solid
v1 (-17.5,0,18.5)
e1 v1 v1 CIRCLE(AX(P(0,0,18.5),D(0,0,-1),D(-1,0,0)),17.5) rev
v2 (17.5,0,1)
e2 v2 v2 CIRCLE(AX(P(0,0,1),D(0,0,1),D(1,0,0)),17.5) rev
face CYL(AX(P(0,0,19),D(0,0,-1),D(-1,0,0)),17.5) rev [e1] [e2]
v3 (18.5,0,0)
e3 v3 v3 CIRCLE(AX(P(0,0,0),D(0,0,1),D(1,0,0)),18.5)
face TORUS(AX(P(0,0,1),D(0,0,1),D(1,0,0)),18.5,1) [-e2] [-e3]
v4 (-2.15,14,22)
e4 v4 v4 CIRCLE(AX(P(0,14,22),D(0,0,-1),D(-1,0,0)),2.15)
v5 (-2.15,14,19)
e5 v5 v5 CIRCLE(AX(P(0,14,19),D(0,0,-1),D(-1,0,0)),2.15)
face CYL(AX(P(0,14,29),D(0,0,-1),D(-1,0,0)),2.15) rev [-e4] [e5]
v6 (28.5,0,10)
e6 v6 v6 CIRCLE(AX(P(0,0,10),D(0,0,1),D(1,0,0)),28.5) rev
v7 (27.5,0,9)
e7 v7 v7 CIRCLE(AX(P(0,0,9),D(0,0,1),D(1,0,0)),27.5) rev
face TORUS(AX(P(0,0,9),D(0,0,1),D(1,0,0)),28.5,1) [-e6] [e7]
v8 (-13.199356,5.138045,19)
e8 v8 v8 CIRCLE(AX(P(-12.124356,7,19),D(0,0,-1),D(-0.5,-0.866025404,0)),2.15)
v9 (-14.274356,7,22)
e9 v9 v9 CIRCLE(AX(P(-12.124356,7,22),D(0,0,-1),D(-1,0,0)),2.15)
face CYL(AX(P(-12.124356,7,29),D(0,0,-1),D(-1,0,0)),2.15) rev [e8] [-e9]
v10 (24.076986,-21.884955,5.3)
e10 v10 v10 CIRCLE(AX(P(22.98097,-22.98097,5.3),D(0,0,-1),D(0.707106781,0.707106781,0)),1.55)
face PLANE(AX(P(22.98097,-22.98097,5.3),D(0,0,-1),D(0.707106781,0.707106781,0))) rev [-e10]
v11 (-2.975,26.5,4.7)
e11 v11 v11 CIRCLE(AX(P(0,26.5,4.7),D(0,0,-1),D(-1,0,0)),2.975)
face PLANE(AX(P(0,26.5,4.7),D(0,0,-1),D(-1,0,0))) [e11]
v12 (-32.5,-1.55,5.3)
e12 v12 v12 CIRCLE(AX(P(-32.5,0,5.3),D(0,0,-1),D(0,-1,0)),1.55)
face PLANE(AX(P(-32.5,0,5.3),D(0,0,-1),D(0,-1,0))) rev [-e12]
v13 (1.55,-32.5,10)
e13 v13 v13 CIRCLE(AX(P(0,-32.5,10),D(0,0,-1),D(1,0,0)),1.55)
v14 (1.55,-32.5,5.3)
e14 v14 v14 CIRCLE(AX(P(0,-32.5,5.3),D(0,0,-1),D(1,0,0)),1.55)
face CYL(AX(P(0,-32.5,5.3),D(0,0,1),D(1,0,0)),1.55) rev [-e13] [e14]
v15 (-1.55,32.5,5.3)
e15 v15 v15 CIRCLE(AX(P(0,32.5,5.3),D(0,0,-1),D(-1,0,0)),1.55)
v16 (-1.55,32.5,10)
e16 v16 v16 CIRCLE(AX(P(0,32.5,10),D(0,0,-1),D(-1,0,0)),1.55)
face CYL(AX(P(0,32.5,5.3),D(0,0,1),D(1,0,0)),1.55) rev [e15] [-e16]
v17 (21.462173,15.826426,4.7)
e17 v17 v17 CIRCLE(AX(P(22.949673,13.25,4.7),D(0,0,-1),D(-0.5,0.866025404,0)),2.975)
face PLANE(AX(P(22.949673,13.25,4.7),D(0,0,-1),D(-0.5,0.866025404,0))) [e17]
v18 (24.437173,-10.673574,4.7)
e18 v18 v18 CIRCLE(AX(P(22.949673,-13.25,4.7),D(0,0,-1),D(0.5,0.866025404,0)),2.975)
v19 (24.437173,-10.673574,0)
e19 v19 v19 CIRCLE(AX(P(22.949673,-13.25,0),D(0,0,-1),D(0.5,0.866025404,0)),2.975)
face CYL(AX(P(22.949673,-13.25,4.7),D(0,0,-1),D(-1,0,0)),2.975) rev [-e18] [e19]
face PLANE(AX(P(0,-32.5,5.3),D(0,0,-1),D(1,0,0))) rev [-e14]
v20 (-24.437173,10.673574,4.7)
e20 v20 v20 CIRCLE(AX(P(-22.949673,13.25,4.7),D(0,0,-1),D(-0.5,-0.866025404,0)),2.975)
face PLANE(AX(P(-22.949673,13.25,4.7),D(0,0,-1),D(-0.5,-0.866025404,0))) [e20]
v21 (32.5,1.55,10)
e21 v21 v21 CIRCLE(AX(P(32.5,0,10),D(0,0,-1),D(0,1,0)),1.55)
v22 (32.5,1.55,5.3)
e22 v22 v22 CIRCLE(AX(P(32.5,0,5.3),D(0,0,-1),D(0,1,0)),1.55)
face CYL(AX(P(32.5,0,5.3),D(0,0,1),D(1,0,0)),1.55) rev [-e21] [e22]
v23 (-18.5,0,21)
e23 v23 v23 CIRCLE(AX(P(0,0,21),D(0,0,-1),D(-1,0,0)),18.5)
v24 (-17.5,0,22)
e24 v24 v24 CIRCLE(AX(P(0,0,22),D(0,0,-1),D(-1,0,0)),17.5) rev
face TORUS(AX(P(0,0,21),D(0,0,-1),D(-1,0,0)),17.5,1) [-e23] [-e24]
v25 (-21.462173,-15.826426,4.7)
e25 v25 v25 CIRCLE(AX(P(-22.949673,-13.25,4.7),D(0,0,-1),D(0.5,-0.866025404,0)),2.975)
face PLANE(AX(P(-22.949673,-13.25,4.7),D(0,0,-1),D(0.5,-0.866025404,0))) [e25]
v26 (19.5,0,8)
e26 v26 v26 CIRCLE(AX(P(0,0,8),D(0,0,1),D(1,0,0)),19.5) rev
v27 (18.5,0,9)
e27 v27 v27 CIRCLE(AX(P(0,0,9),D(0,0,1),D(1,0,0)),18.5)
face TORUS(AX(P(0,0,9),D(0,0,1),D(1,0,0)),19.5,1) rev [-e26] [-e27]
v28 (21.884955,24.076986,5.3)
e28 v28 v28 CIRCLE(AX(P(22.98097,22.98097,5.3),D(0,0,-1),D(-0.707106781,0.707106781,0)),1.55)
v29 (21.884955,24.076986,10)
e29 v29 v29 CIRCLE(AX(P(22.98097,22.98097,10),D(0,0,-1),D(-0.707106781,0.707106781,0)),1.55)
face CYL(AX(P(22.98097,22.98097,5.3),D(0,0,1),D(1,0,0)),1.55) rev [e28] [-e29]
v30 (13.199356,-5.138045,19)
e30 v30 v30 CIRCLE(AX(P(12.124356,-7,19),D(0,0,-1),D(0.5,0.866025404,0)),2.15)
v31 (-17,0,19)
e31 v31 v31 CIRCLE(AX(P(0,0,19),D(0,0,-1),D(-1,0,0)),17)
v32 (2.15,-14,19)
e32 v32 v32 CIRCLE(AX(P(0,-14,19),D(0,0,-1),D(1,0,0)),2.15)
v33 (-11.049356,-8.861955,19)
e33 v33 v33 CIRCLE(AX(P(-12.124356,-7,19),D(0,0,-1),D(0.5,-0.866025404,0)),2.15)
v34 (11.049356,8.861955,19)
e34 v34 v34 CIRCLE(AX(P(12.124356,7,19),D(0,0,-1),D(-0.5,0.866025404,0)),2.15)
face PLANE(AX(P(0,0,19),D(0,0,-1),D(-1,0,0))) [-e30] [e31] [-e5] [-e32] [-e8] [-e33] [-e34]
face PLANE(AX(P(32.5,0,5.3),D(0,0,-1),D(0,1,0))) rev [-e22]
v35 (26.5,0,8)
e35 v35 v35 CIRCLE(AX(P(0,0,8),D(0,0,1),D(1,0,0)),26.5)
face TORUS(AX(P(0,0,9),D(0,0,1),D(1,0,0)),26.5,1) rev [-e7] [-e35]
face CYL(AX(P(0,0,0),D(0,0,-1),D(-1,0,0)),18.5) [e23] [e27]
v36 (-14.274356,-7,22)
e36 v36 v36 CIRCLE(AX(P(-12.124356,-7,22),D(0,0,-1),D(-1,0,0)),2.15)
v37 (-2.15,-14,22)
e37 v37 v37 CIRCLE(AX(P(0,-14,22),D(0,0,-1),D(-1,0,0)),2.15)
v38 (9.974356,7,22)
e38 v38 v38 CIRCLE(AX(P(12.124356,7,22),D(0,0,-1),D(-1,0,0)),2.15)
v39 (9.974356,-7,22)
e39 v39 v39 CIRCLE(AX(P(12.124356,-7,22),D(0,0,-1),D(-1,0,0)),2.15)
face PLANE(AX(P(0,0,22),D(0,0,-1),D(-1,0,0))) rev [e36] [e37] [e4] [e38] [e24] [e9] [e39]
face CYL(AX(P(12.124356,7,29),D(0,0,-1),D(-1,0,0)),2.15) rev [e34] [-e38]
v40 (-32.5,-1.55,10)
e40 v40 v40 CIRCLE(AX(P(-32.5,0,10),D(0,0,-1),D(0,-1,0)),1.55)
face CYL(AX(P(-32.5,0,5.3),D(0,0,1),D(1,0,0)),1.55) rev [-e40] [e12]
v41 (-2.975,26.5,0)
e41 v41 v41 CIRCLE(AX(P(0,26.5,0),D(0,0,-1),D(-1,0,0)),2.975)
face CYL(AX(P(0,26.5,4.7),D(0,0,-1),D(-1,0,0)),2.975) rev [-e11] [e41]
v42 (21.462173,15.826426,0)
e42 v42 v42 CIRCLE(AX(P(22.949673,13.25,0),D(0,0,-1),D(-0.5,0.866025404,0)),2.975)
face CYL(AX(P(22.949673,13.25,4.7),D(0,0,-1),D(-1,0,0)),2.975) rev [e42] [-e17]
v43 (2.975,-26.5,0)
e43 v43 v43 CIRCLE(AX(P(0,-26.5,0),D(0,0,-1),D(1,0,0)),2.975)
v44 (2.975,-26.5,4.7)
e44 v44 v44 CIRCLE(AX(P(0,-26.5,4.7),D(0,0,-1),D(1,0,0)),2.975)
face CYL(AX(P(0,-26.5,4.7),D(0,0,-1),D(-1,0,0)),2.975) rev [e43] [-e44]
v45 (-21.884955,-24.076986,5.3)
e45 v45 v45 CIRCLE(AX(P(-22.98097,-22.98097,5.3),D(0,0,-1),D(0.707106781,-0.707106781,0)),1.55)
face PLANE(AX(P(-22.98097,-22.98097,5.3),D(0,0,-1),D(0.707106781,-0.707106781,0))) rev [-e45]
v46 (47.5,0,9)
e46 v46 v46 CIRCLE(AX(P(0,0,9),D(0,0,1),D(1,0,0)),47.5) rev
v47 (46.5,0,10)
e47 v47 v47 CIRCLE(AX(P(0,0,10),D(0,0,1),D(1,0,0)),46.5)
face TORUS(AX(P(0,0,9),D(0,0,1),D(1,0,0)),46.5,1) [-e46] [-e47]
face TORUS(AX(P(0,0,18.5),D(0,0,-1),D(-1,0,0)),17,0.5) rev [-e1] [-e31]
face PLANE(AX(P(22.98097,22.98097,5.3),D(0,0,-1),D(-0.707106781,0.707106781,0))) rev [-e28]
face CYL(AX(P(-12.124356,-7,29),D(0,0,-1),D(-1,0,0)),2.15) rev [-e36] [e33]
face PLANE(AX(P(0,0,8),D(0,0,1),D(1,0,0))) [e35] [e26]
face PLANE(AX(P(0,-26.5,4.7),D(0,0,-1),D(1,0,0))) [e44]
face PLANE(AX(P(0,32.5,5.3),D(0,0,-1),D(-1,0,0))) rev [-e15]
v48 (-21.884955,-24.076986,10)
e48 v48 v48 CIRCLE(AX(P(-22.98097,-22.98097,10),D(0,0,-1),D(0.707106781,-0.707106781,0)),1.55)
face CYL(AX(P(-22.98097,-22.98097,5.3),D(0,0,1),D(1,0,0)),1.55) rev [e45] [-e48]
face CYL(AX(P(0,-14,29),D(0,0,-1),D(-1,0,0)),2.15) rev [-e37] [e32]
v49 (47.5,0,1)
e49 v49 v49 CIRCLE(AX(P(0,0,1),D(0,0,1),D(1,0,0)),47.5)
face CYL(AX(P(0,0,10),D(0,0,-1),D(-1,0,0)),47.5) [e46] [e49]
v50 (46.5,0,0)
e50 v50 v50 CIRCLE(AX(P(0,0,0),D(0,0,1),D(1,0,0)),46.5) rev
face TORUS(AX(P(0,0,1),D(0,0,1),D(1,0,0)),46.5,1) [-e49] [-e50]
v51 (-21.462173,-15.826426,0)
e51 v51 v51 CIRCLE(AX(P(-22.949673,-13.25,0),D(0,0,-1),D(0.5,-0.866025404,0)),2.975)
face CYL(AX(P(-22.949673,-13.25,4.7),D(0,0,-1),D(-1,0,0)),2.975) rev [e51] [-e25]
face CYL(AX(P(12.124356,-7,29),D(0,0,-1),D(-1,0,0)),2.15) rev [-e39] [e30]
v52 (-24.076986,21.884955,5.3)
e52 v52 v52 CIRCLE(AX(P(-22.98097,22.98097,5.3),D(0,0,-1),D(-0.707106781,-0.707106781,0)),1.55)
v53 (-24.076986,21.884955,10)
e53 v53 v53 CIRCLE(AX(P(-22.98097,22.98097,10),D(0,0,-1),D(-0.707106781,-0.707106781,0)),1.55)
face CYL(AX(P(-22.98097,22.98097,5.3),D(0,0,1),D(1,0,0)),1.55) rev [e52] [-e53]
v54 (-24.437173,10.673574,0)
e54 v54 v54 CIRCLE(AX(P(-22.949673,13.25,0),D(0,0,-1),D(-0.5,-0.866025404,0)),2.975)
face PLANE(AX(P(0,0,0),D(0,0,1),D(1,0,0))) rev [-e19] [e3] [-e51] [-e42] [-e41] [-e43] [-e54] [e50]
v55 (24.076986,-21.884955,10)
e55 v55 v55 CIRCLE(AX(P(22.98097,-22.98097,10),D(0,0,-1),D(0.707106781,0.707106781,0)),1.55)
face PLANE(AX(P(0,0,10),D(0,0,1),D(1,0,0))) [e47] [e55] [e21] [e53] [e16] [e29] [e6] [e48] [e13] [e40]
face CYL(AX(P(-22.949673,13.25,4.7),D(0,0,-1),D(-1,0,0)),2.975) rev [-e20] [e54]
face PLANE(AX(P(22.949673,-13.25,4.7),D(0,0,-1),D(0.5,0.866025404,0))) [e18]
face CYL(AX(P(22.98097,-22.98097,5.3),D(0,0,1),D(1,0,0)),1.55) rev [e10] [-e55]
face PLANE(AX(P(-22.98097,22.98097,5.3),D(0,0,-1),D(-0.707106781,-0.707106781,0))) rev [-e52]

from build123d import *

# Parameters (mm, degrees)
SKETCH1_R           = 47.5
BOSS_EXTRUDE1_DEPTH = 10
SKETCH5_W           = 18.5
SKETCH5_H           = 22
SKETCH6_R           = 17.5
CUT_EXTRUDE7_DEPTH  = 19
SKETCH7_R           = 2.15
CUT_EXTRUDE8_DEPTH  = 10
CIRPATTERN2_COUNT   = 6
SKETCH8_R           = 1.55
CUT_EXTRUDE9_DEPTH  = 4.7
CIRPATTERN3_COUNT   = 8
CUT_EXTRUDE10_START = -2
SKETCH10_R          = 27.5
SKETCH10_R_2        = 18.5
CUT_EXTRUDE10_DEPTH = 2
SKETCH12_R          = 2.975
CUT_EXTRUDE11_DEPTH = 4.7
CIRPATTERN4_COUNT   = 6
FILLET3_R           = 1
FILLET4_R           = 0.5


with BuildPart() as part:
    # Sketch1 → Boss-Extrude1 (new body)
    with BuildSketch(Plane.XY):
        Circle(SKETCH1_R)
    extrude(amount=BOSS_EXTRUDE1_DEPTH)

    # Sketch5 → Revolve1 (revolve)
    with BuildSketch(Plane(origin=(0, 0, 0), x_dir=(1, 0, 0), z_dir=(0, 1, 0)), mode=Mode.PRIVATE) as revolve1_sk:
        with Locations((9.25, -11)):
            Rectangle(SKETCH5_W, SKETCH5_H)
    revolve(revolve1_sk.sketch.rotate(Axis((0, 0, 0), (0, 0, 1)), 180), axis=Axis((0, 0, 0), (0, 0, 1)))

    # Sketch6 → Cut-Extrude7 (cut)
    with BuildSketch(Plane(origin=(0, 0, 0), x_dir=(-1, 0, 0), z_dir=(0, 0, -1))):
        Circle(SKETCH6_R)
    cut_extrude7 = extrude(amount=-CUT_EXTRUDE7_DEPTH, mode=Mode.SUBTRACT)

    # Sketch7 → Cut-Extrude8 (cut)
    with BuildSketch(Plane(origin=(0, 0, 19), x_dir=(-1, 0, 0), z_dir=(0, 0, -1))):
        with Locations((0, 14)):
            Circle(SKETCH7_R)
    cut_extrude8 = extrude(amount=-CUT_EXTRUDE8_DEPTH, mode=Mode.SUBTRACT)

    # CirPattern2: Cut-Extrude7, Cut-Extrude8 ×6 about axis
    cirpattern2_axis = Axis((0, 0, 0), (0, 0, 1))
    add([cut_extrude7.rotate(cirpattern2_axis, i * 360 / CIRPATTERN2_COUNT) for i in range(1, CIRPATTERN2_COUNT)], mode=Mode.SUBTRACT)
    add([cut_extrude8.rotate(cirpattern2_axis, i * 360 / CIRPATTERN2_COUNT) for i in range(1, CIRPATTERN2_COUNT)], mode=Mode.SUBTRACT)

    # Sketch8 → Cut-Extrude9 (cut)
    with BuildSketch(Plane(origin=(0, 0, 10), x_dir=(-1, 0, 0), z_dir=(0, 0, -1))):
        with Locations((0, 32.5)):
            Circle(SKETCH8_R)
    cut_extrude9 = extrude(amount=CUT_EXTRUDE9_DEPTH, mode=Mode.SUBTRACT)

    # CirPattern3: Cut-Extrude9 ×8 about axis
    cirpattern3_axis = Axis((0, 0, 0), (0, 0, 1))
    for i in range(1, CIRPATTERN3_COUNT):
        add(cut_extrude9.rotate(cirpattern3_axis, i * 360 / CIRPATTERN3_COUNT), mode=Mode.SUBTRACT)

    # Sketch10 → Cut-Extrude10 (cut)
    with BuildSketch(Plane.XY.offset(10).offset(CUT_EXTRUDE10_START)):
        Circle(SKETCH10_R)
        with Locations(Location((0, 0, 0), (0, 0, 180))):
            Circle(SKETCH10_R_2, mode=Mode.SUBTRACT)
    extrude(amount=CUT_EXTRUDE10_DEPTH, mode=Mode.SUBTRACT)

    # Sketch12 → Cut-Extrude11 (cut)
    with BuildSketch(Plane(origin=(0, 0, 0), x_dir=(-1, 0, 0), z_dir=(0, 0, -1))):
        with Locations((0, 26.5)):
            Circle(SKETCH12_R)
    cut_extrude11 = extrude(amount=-CUT_EXTRUDE11_DEPTH, mode=Mode.SUBTRACT)

    # CirPattern4: Cut-Extrude11 ×6 about axis
    cirpattern4_axis = Axis((0, 0, 0), (0, 0, 1))
    for i in range(1, CIRPATTERN4_COUNT):
        add(cut_extrude11.rotate(cirpattern4_axis, i * 360 / CIRPATTERN4_COUNT), mode=Mode.SUBTRACT)

    # Fillet3
    fillet3_edges = [part.edges().sort_by_distance(p)[0] for p in [
        (17.5, 0, 0),
        (-47.5, 0, 0),
        (-47.5, 0, 10),
        (18.5, 0, 22),
        (-27.5, 0, 8),
        (18.5, 0, 8),
        (-27.5, 0, 10),
    ]]
    fillet(fillet3_edges, radius=FILLET3_R - 0.0001)  # a hair under: the kernel refuses the full size

    # Fillet4
    fillet4_edges = [part.edges().sort_by_distance(p)[0] for p in [
        (17.5, 0, 19),
    ]]
    fillet(fillet4_edges, radius=FILLET4_R)


solid = part.part
